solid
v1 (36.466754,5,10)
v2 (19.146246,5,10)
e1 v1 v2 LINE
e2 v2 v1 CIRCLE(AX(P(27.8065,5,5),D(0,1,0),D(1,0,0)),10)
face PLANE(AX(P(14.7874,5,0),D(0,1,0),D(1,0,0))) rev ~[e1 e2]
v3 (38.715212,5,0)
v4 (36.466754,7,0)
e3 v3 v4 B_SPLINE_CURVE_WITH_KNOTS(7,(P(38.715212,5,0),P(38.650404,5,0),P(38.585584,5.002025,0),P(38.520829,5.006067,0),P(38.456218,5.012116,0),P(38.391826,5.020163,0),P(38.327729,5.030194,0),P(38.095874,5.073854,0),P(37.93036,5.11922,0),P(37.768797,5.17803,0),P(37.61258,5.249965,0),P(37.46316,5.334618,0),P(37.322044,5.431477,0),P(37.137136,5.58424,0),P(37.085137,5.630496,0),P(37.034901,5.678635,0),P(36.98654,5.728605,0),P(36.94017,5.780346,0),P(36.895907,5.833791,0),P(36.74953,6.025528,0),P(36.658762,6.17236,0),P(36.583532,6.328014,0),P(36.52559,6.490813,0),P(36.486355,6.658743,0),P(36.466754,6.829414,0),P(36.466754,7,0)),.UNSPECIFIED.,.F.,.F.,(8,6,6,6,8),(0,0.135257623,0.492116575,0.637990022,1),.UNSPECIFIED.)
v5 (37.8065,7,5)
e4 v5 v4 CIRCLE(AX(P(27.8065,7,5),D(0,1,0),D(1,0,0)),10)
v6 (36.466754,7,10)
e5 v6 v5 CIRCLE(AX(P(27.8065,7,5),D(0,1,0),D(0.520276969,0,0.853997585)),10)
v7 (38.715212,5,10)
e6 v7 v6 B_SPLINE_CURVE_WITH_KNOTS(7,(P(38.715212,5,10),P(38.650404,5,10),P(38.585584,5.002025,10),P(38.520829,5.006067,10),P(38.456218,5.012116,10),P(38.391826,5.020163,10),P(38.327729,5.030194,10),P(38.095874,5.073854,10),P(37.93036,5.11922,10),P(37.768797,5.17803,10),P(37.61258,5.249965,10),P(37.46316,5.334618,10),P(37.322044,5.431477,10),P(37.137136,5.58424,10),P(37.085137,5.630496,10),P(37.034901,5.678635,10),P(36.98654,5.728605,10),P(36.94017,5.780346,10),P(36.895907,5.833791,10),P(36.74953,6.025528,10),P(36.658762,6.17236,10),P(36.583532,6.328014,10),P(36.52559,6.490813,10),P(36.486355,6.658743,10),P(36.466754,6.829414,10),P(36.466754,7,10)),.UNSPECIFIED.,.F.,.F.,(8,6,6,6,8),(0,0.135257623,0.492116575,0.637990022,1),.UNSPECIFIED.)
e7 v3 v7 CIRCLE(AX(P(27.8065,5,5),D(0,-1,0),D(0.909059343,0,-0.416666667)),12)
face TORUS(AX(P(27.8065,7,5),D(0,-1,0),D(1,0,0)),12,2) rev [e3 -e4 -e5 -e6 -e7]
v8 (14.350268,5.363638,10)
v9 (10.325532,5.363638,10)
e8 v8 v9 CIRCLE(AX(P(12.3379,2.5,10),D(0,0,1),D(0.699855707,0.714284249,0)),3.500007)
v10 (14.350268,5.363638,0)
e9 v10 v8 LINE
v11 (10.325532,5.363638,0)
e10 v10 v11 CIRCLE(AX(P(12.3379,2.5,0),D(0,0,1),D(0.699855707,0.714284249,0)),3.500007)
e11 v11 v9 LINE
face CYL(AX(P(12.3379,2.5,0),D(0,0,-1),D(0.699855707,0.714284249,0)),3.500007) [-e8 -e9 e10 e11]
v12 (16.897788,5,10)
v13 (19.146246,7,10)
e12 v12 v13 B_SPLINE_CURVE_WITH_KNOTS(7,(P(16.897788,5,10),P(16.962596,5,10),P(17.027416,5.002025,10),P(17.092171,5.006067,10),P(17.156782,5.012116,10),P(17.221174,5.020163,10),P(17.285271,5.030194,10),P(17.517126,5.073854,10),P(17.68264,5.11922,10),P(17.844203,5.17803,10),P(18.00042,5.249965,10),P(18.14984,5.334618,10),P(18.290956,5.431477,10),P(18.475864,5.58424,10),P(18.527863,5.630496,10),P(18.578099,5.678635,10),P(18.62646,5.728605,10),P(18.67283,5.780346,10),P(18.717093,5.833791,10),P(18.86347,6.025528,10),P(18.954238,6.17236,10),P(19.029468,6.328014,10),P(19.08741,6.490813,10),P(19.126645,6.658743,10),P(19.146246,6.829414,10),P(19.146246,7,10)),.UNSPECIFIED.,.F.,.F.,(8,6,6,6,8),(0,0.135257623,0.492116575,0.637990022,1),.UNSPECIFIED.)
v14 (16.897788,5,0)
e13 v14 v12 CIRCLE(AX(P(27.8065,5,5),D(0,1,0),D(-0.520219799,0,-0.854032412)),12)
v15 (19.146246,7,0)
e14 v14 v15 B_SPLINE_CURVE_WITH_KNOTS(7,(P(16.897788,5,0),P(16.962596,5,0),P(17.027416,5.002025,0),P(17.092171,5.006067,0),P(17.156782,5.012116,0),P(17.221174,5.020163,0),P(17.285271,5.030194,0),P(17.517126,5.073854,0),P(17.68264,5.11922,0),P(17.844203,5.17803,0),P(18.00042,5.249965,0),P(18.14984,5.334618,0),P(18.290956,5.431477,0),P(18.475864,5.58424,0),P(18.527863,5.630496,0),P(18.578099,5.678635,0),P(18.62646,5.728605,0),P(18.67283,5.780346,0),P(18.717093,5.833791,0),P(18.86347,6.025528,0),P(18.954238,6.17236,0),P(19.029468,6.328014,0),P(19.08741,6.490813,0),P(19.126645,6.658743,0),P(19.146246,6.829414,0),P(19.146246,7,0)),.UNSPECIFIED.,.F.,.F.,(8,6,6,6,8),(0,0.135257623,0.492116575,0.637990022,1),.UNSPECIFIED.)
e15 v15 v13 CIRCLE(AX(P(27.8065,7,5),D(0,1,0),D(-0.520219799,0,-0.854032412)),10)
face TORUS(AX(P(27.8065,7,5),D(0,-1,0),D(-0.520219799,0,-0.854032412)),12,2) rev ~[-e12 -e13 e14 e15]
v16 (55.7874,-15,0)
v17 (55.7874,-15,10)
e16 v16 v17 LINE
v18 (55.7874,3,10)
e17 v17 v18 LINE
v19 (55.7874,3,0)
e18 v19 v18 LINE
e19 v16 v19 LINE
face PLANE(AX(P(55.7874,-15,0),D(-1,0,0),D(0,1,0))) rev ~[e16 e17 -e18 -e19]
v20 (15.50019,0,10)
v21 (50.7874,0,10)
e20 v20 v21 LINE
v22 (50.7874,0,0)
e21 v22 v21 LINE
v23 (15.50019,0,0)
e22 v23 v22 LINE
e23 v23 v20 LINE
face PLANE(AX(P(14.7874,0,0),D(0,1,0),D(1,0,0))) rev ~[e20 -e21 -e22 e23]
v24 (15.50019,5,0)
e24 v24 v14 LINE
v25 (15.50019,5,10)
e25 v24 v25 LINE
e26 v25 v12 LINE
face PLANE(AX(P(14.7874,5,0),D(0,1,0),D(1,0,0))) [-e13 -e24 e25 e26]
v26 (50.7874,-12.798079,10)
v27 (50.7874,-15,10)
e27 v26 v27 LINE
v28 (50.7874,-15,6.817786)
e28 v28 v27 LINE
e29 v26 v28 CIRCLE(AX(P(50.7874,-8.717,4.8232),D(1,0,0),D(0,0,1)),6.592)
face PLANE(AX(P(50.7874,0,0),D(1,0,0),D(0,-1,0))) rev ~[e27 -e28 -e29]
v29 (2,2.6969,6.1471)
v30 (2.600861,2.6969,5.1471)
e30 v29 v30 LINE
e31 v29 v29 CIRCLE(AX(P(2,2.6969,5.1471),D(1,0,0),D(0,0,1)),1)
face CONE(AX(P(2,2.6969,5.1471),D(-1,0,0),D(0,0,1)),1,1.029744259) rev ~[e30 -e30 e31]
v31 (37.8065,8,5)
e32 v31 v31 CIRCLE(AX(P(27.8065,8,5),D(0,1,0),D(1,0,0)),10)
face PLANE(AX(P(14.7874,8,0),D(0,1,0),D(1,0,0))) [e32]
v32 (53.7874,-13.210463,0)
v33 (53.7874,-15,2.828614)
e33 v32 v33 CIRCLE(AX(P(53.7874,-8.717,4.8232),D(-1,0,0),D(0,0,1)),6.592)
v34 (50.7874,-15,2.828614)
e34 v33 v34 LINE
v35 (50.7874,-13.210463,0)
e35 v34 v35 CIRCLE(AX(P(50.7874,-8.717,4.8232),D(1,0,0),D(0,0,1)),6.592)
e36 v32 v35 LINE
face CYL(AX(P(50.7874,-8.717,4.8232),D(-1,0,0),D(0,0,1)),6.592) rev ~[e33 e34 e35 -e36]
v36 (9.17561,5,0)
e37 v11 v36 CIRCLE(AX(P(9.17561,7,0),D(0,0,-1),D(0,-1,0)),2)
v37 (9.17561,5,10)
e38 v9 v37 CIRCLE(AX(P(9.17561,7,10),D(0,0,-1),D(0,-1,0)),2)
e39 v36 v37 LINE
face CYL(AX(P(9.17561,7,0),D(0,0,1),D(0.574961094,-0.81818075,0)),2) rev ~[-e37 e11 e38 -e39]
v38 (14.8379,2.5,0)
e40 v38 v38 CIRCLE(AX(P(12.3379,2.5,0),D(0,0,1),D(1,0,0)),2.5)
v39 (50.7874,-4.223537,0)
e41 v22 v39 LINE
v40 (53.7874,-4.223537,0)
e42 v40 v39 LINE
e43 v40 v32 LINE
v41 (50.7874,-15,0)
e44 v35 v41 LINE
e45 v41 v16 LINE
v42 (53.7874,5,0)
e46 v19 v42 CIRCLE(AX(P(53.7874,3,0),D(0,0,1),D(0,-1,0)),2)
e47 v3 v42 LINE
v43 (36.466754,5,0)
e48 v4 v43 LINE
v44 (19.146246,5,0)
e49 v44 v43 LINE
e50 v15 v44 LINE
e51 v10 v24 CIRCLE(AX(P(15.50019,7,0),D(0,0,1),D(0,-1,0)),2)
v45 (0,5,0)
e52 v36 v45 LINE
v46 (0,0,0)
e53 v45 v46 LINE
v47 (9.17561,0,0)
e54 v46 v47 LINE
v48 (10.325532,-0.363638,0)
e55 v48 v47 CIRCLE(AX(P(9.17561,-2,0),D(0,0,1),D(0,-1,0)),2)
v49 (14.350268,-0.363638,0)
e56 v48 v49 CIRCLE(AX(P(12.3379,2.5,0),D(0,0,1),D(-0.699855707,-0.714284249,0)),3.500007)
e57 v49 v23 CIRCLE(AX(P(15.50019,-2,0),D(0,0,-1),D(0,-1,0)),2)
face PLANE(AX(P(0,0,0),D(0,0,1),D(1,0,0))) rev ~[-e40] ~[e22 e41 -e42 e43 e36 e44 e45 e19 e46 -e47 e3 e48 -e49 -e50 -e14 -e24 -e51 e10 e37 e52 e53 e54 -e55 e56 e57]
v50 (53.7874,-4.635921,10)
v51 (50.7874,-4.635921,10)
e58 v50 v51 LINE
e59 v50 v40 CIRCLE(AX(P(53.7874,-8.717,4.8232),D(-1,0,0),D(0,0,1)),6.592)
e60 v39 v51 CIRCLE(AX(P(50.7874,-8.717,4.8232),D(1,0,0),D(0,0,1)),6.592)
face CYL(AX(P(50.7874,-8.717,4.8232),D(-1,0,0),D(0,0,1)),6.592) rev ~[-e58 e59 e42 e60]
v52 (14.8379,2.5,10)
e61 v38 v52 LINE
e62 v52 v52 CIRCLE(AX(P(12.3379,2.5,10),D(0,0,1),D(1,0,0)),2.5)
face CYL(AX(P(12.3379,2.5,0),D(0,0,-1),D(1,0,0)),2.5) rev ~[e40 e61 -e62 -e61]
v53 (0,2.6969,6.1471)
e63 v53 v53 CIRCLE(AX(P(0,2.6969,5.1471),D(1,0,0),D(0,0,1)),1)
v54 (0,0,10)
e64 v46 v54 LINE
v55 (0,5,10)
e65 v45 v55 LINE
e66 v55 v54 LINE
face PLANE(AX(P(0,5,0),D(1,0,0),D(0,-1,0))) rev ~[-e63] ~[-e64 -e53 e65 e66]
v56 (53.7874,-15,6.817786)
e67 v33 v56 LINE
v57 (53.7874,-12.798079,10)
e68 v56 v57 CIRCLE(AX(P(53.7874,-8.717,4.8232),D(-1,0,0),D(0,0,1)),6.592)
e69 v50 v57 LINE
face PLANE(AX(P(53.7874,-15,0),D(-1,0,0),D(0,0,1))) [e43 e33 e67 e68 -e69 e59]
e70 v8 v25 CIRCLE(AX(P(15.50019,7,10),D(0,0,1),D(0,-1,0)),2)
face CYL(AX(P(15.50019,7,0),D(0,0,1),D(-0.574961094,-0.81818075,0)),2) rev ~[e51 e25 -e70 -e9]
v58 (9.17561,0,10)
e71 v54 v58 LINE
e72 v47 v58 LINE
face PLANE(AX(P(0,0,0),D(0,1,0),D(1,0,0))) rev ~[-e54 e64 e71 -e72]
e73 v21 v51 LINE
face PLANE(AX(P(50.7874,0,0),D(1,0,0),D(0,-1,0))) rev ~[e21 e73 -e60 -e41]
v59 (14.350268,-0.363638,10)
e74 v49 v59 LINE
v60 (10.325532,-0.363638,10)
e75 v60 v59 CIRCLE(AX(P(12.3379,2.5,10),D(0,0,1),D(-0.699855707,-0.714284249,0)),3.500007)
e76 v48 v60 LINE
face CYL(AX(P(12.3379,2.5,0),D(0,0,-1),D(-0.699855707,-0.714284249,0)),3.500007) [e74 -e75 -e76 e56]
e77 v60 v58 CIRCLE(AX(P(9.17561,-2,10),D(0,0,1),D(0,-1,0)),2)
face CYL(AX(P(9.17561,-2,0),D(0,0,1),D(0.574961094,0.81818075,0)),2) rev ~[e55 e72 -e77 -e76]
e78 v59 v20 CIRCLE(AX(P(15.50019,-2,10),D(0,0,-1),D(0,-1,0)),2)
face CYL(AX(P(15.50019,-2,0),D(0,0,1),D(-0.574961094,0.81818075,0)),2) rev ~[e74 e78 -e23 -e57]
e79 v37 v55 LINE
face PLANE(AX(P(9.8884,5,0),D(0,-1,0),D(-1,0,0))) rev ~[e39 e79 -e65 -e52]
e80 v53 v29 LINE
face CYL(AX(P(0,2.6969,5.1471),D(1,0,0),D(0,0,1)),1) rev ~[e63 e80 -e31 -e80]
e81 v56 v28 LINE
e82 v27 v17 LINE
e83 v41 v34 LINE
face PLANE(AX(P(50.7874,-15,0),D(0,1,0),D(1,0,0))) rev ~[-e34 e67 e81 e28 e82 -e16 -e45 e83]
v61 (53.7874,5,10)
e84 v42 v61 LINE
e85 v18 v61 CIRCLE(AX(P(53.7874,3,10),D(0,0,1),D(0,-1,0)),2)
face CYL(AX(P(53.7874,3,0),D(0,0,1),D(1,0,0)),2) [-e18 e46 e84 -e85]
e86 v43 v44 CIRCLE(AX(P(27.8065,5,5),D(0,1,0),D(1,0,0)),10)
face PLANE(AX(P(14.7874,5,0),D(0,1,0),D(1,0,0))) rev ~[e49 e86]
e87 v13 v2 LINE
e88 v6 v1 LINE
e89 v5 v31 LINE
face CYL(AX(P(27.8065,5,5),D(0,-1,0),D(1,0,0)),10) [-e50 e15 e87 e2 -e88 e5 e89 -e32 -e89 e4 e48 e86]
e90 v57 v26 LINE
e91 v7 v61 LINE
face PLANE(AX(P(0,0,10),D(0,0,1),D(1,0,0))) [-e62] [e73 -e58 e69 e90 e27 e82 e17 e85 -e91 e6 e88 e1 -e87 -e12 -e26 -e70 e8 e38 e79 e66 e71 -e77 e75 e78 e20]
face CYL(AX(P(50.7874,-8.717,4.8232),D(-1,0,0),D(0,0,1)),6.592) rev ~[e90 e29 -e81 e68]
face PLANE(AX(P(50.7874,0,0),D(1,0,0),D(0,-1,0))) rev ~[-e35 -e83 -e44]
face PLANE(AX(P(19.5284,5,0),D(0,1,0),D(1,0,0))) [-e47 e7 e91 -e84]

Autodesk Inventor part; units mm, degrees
ref_plane "YZ Plane" through (0, 0, 0) normal (1, 0, 0) x (0, 1, 0)
ref_plane "XZ Plane" through (0, 0, 0) normal (0, 1, 0) x (-1, 0, 0)
ref_plane "XY Plane" through (0, 0, 0) normal (0, 0, 1) x (1, 0, 0)
sketch "Sketch1" plane through (0, 0, 0) normal (0, 0, 1) x (1, 0, 0)
  line L0 (0, 0) -> (9.8884, 0)
  line L1 (9.8884, 5) -> (0, 5)
  line L2 (0, 5) -> (0, 0)
  circle A0 centre (12.3379, 2.5) radius 2.5
  line L3 (14.7874, 5) -> (19.5284, 5)
  arc A1 (14.7874, 5) -> (9.8884, 5) centre (12.3379, 2.5) ccw
  arc A2 (9.8884, 0) -> (14.7874, 0) centre (12.3379, 2.5) ccw
  line L4 (19.5284, 5) -> (55.7874, 5)
  line L5 (14.7874, 0) -> (50.7874, 0)
  line L6 (50.7874, 0) -> (50.7874, -15)
  line L7 (50.7874, -15) -> (55.7874, -15)
  line L8 (55.7874, -15) -> (55.7874, 5)
  dimension "d6" = 5
  dimension "d7" = 3.5
  dimension "d8" = 36
  dimension "d9" = 15
  dimension "d10" = 5
extrude "Extrusion1" add sketch "Sketch1" along normal blind 10
sketch "Sketch2" plane through (14.7874, 5, 0) normal (0, 1, 0) x (1, 0, 0)
  circle A0 centre (13.0191, -5) radius 10
  point P0 (-14.7874, 0)
  dimension "d16" = 20
extrude "Extrusion2" add sketch "Sketch2" along normal blind 3
fillet "Fillet1" radius 2 1 edges at (17.8065, 5, 5)
fillet "Fillet2" radius 2 1 edges at (37.4658, 5, 2.4118)
fillet "Fillet3" radius 2 1 edges at (55.7874, 5, 5)
sketch "Sketch3" plane through (50.7874, -15, 0) normal (-1, 0, 0) x (0, 0, 1)
  circle A0 centre (4.8232, 6.283) radius 6.592
  line L0 (0, 0) -> (10, 0) projected
  point P0 (0, 15)
extrude "Extrusion3" cut sketch "Sketch3" against normal blind 3
fillet "Fillet4" radius 2 1 edges at (14.7874, 5, 5)
fillet "Fillet5" radius 2 1 edges at (9.8884, 5, 5)
fillet "Fillet6" radius 2 1 edges at (14.7874, 0, 5)
fillet "Fillet7" radius 2 1 edges at (9.8884, 0, 5)
sketch "Sketch4" plane through (0, 0, 0) normal (-1, 0, 0) x (0, 0, 1)
  point P0 (0, 0)
  point P1 (5.1471, 2.6969)
hole "Hole1" at (0, 2.6969, 5.1471) direction (1, 0, 0) diameter 2 depth 2 tip angle 118
properties part number "Rocker1"
